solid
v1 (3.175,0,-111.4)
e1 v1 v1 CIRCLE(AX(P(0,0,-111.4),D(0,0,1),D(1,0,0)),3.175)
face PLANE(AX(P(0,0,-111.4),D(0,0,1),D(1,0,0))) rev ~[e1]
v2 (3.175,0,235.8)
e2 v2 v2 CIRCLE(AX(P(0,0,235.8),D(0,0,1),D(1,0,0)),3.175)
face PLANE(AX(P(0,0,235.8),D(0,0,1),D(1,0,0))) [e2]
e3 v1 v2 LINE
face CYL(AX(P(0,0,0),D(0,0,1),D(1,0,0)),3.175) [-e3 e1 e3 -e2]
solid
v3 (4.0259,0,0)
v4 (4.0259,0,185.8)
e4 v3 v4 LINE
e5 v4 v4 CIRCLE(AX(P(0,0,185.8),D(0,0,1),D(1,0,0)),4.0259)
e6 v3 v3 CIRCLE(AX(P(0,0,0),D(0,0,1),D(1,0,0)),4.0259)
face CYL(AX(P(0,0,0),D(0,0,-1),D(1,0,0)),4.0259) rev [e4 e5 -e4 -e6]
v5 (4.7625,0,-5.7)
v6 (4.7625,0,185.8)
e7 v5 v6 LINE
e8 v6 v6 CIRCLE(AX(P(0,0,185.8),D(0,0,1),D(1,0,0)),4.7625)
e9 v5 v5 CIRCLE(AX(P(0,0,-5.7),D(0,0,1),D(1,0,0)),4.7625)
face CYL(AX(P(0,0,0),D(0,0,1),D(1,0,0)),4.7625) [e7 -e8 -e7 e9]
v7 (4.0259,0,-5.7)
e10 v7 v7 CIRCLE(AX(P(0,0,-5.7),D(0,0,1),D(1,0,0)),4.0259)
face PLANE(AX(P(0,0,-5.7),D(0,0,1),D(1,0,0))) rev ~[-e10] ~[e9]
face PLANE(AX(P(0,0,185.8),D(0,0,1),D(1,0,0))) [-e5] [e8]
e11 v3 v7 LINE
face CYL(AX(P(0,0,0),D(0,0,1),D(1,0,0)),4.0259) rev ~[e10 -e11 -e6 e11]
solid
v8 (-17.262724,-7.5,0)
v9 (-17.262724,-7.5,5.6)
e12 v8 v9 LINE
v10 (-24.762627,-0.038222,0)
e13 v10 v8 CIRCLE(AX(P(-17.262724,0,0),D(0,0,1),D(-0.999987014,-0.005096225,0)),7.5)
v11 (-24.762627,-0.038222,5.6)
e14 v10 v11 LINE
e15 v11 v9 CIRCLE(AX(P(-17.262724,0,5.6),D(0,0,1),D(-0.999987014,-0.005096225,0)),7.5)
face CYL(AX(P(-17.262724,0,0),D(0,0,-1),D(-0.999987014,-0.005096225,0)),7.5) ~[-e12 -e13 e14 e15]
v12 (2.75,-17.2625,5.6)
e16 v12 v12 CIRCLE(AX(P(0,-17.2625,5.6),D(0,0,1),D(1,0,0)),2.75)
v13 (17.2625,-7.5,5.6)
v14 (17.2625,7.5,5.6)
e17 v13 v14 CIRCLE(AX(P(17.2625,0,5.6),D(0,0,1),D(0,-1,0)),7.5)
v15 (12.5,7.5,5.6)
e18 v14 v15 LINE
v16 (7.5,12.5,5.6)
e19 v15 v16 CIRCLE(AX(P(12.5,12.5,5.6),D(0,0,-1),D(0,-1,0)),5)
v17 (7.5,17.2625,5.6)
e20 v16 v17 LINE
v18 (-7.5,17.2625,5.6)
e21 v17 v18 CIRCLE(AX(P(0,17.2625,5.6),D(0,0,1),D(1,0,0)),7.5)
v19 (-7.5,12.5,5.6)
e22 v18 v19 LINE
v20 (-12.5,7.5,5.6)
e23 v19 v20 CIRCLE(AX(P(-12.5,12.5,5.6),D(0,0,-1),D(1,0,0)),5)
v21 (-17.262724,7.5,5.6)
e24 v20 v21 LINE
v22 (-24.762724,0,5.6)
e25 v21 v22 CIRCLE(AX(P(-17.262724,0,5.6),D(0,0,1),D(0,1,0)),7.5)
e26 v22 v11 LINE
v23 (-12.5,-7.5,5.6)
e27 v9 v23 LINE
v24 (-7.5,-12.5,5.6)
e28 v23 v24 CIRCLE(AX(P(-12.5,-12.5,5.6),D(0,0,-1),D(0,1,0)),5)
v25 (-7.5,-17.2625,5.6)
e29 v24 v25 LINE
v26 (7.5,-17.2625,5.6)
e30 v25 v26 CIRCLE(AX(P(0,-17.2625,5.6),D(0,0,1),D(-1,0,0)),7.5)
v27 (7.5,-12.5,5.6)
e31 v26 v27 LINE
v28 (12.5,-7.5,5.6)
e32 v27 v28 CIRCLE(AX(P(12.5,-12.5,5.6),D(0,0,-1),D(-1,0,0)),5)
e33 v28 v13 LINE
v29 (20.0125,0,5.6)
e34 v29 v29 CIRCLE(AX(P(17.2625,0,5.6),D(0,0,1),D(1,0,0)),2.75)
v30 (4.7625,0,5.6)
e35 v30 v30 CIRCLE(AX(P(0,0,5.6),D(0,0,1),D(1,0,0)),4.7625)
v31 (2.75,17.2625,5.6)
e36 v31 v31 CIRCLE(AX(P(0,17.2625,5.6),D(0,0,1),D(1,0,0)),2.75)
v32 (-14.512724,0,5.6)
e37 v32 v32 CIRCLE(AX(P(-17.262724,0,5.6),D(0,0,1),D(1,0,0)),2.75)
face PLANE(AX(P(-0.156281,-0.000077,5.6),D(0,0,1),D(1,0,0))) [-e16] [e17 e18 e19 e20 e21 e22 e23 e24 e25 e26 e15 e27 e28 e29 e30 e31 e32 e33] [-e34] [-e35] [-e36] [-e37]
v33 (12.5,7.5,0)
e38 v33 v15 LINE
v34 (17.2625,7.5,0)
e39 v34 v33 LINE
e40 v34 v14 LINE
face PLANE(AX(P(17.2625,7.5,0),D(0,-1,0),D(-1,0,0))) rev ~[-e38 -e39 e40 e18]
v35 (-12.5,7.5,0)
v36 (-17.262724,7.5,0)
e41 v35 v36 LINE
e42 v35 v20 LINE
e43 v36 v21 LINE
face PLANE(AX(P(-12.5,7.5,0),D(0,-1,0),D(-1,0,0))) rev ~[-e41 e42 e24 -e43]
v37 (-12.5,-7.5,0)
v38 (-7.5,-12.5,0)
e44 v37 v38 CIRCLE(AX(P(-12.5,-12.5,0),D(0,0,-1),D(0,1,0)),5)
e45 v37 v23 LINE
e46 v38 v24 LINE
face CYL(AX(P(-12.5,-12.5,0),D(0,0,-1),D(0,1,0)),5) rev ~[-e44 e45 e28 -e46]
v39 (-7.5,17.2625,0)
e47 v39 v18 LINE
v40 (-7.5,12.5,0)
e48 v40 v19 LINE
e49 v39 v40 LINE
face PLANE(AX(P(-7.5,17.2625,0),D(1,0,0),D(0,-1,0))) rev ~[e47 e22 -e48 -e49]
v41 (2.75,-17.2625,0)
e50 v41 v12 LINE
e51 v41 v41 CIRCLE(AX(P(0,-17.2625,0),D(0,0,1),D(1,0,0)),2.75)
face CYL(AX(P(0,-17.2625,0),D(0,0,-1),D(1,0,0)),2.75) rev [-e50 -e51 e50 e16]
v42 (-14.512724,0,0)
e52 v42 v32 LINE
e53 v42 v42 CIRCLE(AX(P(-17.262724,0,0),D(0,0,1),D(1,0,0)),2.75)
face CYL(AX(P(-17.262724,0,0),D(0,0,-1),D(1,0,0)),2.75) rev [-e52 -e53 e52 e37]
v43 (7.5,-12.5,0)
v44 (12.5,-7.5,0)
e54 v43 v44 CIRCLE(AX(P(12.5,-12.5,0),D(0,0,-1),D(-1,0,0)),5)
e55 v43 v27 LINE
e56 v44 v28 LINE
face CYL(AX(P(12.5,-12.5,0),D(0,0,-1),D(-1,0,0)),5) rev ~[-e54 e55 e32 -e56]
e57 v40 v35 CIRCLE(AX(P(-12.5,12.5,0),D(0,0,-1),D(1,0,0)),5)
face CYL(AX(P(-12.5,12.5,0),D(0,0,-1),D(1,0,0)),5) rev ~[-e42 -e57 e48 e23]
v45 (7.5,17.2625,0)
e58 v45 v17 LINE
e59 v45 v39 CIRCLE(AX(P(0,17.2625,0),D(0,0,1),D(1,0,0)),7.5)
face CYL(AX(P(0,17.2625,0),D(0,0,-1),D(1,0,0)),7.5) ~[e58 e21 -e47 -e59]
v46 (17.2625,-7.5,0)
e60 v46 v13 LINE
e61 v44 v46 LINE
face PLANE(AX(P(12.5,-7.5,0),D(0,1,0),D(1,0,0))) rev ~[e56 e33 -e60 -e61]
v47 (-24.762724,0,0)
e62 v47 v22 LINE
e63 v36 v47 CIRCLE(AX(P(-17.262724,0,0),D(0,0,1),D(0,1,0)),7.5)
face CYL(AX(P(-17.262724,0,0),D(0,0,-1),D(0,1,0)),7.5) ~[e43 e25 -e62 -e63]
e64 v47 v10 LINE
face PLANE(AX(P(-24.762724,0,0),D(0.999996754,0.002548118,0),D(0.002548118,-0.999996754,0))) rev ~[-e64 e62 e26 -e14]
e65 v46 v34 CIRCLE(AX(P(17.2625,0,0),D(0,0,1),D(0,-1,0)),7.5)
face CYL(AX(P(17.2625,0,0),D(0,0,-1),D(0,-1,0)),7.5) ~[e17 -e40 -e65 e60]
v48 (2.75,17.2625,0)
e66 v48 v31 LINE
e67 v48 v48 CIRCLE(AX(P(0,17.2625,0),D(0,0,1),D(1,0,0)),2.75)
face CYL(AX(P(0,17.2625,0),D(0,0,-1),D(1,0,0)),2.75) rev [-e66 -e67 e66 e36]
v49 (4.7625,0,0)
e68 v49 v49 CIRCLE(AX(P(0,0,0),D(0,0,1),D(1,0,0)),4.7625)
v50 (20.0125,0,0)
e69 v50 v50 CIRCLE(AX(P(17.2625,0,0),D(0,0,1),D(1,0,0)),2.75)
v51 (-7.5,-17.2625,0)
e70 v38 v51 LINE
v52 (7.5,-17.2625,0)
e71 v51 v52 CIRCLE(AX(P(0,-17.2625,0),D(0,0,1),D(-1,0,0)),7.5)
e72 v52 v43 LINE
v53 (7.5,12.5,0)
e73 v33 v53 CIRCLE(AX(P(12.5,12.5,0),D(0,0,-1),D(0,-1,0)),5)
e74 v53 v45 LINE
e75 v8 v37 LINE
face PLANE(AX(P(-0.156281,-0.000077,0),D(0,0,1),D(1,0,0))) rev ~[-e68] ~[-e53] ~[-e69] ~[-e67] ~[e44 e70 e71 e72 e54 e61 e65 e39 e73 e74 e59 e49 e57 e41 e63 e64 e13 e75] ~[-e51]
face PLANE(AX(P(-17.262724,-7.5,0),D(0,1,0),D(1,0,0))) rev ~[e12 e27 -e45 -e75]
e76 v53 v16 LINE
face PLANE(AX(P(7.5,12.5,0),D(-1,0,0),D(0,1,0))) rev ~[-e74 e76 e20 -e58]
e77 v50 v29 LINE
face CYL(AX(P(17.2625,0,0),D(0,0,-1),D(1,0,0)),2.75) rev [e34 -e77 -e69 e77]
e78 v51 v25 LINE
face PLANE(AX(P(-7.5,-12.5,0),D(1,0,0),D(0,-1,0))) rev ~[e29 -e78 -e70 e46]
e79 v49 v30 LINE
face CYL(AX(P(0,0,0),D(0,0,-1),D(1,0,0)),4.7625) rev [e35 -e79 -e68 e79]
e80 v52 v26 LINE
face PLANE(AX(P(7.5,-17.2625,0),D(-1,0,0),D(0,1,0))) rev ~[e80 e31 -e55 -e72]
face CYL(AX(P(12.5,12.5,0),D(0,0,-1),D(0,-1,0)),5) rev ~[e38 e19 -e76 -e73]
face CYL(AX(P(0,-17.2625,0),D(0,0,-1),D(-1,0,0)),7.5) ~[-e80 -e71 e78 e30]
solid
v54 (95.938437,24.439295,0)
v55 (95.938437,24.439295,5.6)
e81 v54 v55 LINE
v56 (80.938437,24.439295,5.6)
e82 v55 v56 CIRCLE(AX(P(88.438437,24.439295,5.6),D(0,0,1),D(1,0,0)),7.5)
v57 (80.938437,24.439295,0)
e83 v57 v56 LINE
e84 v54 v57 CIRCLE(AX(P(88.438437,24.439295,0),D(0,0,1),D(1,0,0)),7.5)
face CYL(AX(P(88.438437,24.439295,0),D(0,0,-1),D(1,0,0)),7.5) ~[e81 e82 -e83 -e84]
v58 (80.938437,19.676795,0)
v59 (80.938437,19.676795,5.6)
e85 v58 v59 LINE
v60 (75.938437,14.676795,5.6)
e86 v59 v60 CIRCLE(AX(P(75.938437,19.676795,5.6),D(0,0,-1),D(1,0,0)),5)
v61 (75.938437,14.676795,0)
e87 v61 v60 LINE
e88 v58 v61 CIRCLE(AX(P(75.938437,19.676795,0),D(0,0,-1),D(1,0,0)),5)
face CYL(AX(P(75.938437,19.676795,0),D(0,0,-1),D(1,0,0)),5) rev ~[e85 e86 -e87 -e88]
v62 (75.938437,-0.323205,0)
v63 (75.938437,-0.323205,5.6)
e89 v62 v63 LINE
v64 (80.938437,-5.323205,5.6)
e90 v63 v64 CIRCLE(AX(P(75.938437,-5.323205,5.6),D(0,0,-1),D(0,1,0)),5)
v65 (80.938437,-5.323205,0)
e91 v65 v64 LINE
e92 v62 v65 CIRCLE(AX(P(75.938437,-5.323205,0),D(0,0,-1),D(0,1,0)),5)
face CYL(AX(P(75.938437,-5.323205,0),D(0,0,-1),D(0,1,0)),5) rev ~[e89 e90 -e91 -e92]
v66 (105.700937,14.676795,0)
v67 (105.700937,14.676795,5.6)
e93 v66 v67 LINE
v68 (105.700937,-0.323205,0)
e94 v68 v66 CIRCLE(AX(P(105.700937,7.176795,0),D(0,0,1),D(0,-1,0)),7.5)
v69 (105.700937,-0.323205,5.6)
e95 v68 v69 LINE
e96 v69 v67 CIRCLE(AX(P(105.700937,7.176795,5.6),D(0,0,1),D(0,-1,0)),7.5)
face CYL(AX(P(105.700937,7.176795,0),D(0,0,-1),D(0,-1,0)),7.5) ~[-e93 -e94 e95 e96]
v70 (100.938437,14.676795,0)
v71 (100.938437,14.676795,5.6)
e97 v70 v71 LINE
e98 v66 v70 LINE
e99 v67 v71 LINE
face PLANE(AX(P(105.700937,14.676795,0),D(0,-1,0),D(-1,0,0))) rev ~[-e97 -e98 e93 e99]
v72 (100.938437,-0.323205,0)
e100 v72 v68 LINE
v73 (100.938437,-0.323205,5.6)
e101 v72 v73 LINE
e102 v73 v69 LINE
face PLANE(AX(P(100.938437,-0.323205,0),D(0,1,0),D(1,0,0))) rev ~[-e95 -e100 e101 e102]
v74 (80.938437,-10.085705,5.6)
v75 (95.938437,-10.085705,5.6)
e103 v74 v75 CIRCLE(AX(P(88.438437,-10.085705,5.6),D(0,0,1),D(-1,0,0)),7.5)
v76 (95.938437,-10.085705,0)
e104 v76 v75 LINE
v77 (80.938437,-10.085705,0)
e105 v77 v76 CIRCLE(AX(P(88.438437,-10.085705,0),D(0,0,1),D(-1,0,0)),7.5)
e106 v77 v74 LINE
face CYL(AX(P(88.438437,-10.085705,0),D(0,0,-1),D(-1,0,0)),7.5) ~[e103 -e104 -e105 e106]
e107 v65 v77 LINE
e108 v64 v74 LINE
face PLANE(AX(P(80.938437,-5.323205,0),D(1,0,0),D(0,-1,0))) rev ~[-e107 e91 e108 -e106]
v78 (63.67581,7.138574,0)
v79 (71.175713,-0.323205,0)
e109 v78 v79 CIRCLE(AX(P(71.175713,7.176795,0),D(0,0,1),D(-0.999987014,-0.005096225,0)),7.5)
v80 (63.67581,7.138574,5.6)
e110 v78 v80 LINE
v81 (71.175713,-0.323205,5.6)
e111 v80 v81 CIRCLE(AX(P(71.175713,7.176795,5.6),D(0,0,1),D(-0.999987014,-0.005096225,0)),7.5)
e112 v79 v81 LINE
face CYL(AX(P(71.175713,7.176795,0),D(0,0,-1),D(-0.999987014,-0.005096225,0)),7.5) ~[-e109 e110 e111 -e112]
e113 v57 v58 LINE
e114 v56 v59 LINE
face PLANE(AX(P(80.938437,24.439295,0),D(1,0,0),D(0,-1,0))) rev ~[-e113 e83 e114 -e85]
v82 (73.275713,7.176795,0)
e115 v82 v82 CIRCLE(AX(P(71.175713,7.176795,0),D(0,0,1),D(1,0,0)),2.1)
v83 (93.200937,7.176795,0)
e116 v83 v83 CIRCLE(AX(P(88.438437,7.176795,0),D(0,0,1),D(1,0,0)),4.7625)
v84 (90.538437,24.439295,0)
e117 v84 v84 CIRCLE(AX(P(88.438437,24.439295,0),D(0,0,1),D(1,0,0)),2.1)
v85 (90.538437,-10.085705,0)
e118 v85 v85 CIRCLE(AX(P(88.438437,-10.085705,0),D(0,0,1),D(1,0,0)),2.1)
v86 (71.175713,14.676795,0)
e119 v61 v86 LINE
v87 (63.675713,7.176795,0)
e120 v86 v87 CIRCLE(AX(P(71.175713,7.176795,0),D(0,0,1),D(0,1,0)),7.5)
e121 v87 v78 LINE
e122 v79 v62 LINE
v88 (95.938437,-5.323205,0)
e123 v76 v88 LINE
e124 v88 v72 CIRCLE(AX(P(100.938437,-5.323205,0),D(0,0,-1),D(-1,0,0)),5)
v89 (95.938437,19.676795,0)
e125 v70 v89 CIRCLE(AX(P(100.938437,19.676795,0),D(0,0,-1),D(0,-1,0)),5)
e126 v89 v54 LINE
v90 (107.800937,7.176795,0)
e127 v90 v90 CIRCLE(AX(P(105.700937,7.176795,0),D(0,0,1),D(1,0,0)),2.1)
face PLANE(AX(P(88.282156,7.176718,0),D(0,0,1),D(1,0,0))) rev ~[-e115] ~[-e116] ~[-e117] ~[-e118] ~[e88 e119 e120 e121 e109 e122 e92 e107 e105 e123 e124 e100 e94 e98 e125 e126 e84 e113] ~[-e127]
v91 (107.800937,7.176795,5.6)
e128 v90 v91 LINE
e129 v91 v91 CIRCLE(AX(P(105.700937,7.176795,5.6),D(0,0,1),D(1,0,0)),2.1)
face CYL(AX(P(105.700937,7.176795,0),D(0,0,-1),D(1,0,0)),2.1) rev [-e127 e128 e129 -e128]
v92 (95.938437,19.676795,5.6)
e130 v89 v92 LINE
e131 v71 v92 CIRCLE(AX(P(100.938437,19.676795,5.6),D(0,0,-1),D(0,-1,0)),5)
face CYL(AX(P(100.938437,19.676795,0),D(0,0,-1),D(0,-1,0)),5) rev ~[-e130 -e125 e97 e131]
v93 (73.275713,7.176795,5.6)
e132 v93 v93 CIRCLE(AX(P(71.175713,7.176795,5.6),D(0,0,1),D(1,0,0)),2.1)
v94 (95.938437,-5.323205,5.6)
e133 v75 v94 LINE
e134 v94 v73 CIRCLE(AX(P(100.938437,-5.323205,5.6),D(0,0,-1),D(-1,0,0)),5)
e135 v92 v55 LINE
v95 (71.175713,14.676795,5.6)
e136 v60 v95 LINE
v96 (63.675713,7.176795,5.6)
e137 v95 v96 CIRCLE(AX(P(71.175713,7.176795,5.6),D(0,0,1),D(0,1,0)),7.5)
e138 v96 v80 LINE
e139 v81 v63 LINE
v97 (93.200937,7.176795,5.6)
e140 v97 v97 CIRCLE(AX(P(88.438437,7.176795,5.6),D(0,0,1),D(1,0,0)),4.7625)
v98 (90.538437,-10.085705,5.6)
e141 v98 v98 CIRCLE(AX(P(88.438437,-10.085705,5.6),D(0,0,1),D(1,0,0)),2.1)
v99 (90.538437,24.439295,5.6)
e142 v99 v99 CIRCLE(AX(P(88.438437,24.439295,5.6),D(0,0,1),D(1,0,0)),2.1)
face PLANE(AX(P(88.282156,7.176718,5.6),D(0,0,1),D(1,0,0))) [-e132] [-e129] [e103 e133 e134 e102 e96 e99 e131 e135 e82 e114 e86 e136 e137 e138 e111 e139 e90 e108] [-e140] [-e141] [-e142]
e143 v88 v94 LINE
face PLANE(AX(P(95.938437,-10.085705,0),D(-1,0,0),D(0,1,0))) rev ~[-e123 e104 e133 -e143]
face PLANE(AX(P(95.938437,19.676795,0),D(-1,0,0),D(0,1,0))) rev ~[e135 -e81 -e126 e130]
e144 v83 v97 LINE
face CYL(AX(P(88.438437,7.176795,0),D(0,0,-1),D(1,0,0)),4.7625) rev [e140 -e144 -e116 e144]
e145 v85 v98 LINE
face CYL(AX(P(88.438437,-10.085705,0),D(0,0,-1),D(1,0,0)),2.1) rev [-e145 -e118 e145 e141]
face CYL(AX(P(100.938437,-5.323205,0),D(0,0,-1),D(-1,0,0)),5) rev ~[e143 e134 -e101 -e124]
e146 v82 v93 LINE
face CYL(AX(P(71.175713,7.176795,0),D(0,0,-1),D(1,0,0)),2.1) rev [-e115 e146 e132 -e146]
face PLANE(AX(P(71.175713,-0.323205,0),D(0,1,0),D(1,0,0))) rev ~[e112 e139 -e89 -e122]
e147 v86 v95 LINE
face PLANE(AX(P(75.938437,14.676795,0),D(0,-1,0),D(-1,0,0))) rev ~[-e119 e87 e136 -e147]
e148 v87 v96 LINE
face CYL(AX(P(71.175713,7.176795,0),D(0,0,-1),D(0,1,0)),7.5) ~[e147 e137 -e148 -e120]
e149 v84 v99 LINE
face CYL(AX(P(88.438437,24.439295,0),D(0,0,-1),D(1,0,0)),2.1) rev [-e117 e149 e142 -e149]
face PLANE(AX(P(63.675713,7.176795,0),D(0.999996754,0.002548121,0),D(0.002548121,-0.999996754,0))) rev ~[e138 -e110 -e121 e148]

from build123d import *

# Parameters (mm, degrees)
F0_R          = 3.175
F1_DEPTH      = 235.8
F1_DEPTH_BACK = 111.4
F2_R          = 4.7625
F2_R_2        = 4.0259
F3_DEPTH      = 185.8
F3_DEPTH_BACK = 5.7
F4_R          = 2.75
F4_R_2        = 4.7625
F6_DEPTH      = 5.6
F5_R          = 2.1
F5_R_2        = 4.7625
F7_DEPTH      = 5.6


# Not quite as in the source:
# - ends of sketch curves that miss each other by under 0.0002 mm in the source are joined


with BuildPart() as f1:
    # F0 (on Top) → F1 (new body, two sides)
    with BuildSketch(Plane.XY) as f1_sk:
        Circle(F0_R)
    extrude(amount=F1_DEPTH)
    extrude(f1_sk.sketch, amount=-F1_DEPTH_BACK)


with BuildPart() as f3:
    # F2 (on Top) → F3 (new body, two sides)
    with BuildSketch(Plane.XY) as f3_sk:
        Circle(F2_R)
        Circle(F2_R_2, mode=Mode.SUBTRACT)
    extrude(amount=F3_DEPTH)
    extrude(f3_sk.sketch, amount=-F3_DEPTH_BACK)


with BuildPart() as f6:
    # F4 (on Top) → F6 (new body)
    with BuildSketch(Plane.XY):
        with BuildLine():
            ThreePointArc((7.5, 17.2625), (0, 24.7625), (-7.5, 17.2625))
            Line((-7.5, 17.2625), (-7.5, 12.5))
            ThreePointArc((-7.5, 12.5), (-8.9644660941, 8.9644660941), (-12.5, 7.5))
            Line((-12.5, 7.5), (-17.2627241709, 7.5))
            ThreePointArc((-17.2627241709, 7.5), (-22.5660250298, 5.3033008589), (-24.7627241709, 0))
            Line((-24.7627241709, 0), (-24.7626267772, -0.0382216857))
            ThreePointArc((-24.7626267772, -0.0382216857), (-22.5524943624, -5.3167970924), (-17.2627241709, -7.5))
            Line((-17.2627241709, -7.5), (-12.5, -7.5))
            ThreePointArc((-12.5, -7.5), (-8.9644660941, -8.9644660941), (-7.5, -12.5))
            Line((-7.5, -12.5), (-7.5, -17.2625))
            ThreePointArc((-7.5, -17.2625), (0, -24.7625), (7.5, -17.2625))
            Line((7.5, -17.2625), (7.5, -12.5))
            ThreePointArc((7.5, -12.5), (8.9644660941, -8.9644660941), (12.5, -7.5))
            Line((12.5, -7.5), (17.2625, -7.5))
            ThreePointArc((17.2625, -7.5), (24.7625, 0), (17.2625, 7.5))
            Line((17.2625, 7.5), (12.5, 7.5))
            ThreePointArc((12.5, 7.5), (8.9644660941, 8.9644660941), (7.5, 12.5))
            Line((7.5, 12.5), (7.5, 17.2625))
        make_face()
        with Locations((0, -17.2625)):
            Circle(F4_R, mode=Mode.SUBTRACT)
        with Locations((-17.2627241709, 0)):
            Circle(F4_R, mode=Mode.SUBTRACT)
        Circle(F4_R_2, mode=Mode.SUBTRACT)
        with Locations((17.2625, 0)):
            Circle(F4_R, mode=Mode.SUBTRACT)
        with Locations((0, 17.2625)):
            Circle(F4_R, mode=Mode.SUBTRACT)
    extrude(amount=F6_DEPTH)


with BuildPart() as f7:
    # F5 (on Top) → F7 (new body)
    with BuildSketch(Plane.XY):
        with BuildLine():
            ThreePointArc((95.9384369603, 24.4392953578), (88.4384369603, 31.9392953578), (80.9384369603, 24.4392953578))
            Line((80.9384369603, 24.4392953578), (80.9384369603, 19.6767953578))
            ThreePointArc((80.9384369603, 19.6767953578), (79.4739708663, 16.1412614519), (75.9384369603, 14.6767953578))
            Line((75.9384369603, 14.6767953578), (71.1757127894, 14.6767953578))
            ThreePointArc((71.1757127894, 14.6767953578), (65.8724119305, 12.4800962167), (63.6757127894, 7.1767953578))
            Line((63.6757127894, 7.1767953578), (63.6758101832, 7.1385736721))
            ThreePointArc((63.6758101832, 7.1385736721), (65.8859425979, 1.8599982654), (71.1757127894, -0.3232046422))
            Line((71.1757127894, -0.3232046422), (75.9384369603, -0.3232046422))
            ThreePointArc((75.9384369603, -0.3232046422), (79.4739708663, -1.7876707363), (80.9384369603, -5.3232046422))
            Line((80.9384369603, -5.3232046422), (80.9384369603, -10.0857046422))
            ThreePointArc((80.9384369603, -10.0857046422), (88.4384369603, -17.5857046422), (95.9384369603, -10.0857046422))
            Line((95.9384369603, -10.0857046422), (95.9384369603, -5.3232046422))
            ThreePointArc((95.9384369603, -5.3232046422), (97.4029030544, -1.7876707363), (100.9384369603, -0.3232046422))
            Line((100.9384369603, -0.3232046422), (105.7009369603, -0.3232046422))
            ThreePointArc((105.7009369603, -0.3232046422), (113.2009369603, 7.1767953578), (105.7009369603, 14.6767953578))
            Line((105.7009369603, 14.6767953578), (100.9384369603, 14.6767953578))
            ThreePointArc((100.9384369603, 14.6767953578), (97.4029030544, 16.1412614519), (95.9384369603, 19.6767953578))
            Line((95.9384369603, 19.6767953578), (95.9384369603, 24.4392953578))
        make_face()
        with Locations((71.1757127894, 7.1767953578)):
            Circle(F5_R, mode=Mode.SUBTRACT)
        with Locations((88.4384369603, -10.0857046422)):
            Circle(F5_R, mode=Mode.SUBTRACT)
        with Locations((88.4384369603, 7.1767953578)):
            Circle(F5_R_2, mode=Mode.SUBTRACT)
        with Locations((105.7009369603, 7.1767953578)):
            Circle(F5_R, mode=Mode.SUBTRACT)
        with Locations((88.4384369603, 24.4392953578)):
            Circle(F5_R, mode=Mode.SUBTRACT)
    extrude(amount=F7_DEPTH)


solid = Compound([f1.part, f3.part, f6.part, f7.part])
